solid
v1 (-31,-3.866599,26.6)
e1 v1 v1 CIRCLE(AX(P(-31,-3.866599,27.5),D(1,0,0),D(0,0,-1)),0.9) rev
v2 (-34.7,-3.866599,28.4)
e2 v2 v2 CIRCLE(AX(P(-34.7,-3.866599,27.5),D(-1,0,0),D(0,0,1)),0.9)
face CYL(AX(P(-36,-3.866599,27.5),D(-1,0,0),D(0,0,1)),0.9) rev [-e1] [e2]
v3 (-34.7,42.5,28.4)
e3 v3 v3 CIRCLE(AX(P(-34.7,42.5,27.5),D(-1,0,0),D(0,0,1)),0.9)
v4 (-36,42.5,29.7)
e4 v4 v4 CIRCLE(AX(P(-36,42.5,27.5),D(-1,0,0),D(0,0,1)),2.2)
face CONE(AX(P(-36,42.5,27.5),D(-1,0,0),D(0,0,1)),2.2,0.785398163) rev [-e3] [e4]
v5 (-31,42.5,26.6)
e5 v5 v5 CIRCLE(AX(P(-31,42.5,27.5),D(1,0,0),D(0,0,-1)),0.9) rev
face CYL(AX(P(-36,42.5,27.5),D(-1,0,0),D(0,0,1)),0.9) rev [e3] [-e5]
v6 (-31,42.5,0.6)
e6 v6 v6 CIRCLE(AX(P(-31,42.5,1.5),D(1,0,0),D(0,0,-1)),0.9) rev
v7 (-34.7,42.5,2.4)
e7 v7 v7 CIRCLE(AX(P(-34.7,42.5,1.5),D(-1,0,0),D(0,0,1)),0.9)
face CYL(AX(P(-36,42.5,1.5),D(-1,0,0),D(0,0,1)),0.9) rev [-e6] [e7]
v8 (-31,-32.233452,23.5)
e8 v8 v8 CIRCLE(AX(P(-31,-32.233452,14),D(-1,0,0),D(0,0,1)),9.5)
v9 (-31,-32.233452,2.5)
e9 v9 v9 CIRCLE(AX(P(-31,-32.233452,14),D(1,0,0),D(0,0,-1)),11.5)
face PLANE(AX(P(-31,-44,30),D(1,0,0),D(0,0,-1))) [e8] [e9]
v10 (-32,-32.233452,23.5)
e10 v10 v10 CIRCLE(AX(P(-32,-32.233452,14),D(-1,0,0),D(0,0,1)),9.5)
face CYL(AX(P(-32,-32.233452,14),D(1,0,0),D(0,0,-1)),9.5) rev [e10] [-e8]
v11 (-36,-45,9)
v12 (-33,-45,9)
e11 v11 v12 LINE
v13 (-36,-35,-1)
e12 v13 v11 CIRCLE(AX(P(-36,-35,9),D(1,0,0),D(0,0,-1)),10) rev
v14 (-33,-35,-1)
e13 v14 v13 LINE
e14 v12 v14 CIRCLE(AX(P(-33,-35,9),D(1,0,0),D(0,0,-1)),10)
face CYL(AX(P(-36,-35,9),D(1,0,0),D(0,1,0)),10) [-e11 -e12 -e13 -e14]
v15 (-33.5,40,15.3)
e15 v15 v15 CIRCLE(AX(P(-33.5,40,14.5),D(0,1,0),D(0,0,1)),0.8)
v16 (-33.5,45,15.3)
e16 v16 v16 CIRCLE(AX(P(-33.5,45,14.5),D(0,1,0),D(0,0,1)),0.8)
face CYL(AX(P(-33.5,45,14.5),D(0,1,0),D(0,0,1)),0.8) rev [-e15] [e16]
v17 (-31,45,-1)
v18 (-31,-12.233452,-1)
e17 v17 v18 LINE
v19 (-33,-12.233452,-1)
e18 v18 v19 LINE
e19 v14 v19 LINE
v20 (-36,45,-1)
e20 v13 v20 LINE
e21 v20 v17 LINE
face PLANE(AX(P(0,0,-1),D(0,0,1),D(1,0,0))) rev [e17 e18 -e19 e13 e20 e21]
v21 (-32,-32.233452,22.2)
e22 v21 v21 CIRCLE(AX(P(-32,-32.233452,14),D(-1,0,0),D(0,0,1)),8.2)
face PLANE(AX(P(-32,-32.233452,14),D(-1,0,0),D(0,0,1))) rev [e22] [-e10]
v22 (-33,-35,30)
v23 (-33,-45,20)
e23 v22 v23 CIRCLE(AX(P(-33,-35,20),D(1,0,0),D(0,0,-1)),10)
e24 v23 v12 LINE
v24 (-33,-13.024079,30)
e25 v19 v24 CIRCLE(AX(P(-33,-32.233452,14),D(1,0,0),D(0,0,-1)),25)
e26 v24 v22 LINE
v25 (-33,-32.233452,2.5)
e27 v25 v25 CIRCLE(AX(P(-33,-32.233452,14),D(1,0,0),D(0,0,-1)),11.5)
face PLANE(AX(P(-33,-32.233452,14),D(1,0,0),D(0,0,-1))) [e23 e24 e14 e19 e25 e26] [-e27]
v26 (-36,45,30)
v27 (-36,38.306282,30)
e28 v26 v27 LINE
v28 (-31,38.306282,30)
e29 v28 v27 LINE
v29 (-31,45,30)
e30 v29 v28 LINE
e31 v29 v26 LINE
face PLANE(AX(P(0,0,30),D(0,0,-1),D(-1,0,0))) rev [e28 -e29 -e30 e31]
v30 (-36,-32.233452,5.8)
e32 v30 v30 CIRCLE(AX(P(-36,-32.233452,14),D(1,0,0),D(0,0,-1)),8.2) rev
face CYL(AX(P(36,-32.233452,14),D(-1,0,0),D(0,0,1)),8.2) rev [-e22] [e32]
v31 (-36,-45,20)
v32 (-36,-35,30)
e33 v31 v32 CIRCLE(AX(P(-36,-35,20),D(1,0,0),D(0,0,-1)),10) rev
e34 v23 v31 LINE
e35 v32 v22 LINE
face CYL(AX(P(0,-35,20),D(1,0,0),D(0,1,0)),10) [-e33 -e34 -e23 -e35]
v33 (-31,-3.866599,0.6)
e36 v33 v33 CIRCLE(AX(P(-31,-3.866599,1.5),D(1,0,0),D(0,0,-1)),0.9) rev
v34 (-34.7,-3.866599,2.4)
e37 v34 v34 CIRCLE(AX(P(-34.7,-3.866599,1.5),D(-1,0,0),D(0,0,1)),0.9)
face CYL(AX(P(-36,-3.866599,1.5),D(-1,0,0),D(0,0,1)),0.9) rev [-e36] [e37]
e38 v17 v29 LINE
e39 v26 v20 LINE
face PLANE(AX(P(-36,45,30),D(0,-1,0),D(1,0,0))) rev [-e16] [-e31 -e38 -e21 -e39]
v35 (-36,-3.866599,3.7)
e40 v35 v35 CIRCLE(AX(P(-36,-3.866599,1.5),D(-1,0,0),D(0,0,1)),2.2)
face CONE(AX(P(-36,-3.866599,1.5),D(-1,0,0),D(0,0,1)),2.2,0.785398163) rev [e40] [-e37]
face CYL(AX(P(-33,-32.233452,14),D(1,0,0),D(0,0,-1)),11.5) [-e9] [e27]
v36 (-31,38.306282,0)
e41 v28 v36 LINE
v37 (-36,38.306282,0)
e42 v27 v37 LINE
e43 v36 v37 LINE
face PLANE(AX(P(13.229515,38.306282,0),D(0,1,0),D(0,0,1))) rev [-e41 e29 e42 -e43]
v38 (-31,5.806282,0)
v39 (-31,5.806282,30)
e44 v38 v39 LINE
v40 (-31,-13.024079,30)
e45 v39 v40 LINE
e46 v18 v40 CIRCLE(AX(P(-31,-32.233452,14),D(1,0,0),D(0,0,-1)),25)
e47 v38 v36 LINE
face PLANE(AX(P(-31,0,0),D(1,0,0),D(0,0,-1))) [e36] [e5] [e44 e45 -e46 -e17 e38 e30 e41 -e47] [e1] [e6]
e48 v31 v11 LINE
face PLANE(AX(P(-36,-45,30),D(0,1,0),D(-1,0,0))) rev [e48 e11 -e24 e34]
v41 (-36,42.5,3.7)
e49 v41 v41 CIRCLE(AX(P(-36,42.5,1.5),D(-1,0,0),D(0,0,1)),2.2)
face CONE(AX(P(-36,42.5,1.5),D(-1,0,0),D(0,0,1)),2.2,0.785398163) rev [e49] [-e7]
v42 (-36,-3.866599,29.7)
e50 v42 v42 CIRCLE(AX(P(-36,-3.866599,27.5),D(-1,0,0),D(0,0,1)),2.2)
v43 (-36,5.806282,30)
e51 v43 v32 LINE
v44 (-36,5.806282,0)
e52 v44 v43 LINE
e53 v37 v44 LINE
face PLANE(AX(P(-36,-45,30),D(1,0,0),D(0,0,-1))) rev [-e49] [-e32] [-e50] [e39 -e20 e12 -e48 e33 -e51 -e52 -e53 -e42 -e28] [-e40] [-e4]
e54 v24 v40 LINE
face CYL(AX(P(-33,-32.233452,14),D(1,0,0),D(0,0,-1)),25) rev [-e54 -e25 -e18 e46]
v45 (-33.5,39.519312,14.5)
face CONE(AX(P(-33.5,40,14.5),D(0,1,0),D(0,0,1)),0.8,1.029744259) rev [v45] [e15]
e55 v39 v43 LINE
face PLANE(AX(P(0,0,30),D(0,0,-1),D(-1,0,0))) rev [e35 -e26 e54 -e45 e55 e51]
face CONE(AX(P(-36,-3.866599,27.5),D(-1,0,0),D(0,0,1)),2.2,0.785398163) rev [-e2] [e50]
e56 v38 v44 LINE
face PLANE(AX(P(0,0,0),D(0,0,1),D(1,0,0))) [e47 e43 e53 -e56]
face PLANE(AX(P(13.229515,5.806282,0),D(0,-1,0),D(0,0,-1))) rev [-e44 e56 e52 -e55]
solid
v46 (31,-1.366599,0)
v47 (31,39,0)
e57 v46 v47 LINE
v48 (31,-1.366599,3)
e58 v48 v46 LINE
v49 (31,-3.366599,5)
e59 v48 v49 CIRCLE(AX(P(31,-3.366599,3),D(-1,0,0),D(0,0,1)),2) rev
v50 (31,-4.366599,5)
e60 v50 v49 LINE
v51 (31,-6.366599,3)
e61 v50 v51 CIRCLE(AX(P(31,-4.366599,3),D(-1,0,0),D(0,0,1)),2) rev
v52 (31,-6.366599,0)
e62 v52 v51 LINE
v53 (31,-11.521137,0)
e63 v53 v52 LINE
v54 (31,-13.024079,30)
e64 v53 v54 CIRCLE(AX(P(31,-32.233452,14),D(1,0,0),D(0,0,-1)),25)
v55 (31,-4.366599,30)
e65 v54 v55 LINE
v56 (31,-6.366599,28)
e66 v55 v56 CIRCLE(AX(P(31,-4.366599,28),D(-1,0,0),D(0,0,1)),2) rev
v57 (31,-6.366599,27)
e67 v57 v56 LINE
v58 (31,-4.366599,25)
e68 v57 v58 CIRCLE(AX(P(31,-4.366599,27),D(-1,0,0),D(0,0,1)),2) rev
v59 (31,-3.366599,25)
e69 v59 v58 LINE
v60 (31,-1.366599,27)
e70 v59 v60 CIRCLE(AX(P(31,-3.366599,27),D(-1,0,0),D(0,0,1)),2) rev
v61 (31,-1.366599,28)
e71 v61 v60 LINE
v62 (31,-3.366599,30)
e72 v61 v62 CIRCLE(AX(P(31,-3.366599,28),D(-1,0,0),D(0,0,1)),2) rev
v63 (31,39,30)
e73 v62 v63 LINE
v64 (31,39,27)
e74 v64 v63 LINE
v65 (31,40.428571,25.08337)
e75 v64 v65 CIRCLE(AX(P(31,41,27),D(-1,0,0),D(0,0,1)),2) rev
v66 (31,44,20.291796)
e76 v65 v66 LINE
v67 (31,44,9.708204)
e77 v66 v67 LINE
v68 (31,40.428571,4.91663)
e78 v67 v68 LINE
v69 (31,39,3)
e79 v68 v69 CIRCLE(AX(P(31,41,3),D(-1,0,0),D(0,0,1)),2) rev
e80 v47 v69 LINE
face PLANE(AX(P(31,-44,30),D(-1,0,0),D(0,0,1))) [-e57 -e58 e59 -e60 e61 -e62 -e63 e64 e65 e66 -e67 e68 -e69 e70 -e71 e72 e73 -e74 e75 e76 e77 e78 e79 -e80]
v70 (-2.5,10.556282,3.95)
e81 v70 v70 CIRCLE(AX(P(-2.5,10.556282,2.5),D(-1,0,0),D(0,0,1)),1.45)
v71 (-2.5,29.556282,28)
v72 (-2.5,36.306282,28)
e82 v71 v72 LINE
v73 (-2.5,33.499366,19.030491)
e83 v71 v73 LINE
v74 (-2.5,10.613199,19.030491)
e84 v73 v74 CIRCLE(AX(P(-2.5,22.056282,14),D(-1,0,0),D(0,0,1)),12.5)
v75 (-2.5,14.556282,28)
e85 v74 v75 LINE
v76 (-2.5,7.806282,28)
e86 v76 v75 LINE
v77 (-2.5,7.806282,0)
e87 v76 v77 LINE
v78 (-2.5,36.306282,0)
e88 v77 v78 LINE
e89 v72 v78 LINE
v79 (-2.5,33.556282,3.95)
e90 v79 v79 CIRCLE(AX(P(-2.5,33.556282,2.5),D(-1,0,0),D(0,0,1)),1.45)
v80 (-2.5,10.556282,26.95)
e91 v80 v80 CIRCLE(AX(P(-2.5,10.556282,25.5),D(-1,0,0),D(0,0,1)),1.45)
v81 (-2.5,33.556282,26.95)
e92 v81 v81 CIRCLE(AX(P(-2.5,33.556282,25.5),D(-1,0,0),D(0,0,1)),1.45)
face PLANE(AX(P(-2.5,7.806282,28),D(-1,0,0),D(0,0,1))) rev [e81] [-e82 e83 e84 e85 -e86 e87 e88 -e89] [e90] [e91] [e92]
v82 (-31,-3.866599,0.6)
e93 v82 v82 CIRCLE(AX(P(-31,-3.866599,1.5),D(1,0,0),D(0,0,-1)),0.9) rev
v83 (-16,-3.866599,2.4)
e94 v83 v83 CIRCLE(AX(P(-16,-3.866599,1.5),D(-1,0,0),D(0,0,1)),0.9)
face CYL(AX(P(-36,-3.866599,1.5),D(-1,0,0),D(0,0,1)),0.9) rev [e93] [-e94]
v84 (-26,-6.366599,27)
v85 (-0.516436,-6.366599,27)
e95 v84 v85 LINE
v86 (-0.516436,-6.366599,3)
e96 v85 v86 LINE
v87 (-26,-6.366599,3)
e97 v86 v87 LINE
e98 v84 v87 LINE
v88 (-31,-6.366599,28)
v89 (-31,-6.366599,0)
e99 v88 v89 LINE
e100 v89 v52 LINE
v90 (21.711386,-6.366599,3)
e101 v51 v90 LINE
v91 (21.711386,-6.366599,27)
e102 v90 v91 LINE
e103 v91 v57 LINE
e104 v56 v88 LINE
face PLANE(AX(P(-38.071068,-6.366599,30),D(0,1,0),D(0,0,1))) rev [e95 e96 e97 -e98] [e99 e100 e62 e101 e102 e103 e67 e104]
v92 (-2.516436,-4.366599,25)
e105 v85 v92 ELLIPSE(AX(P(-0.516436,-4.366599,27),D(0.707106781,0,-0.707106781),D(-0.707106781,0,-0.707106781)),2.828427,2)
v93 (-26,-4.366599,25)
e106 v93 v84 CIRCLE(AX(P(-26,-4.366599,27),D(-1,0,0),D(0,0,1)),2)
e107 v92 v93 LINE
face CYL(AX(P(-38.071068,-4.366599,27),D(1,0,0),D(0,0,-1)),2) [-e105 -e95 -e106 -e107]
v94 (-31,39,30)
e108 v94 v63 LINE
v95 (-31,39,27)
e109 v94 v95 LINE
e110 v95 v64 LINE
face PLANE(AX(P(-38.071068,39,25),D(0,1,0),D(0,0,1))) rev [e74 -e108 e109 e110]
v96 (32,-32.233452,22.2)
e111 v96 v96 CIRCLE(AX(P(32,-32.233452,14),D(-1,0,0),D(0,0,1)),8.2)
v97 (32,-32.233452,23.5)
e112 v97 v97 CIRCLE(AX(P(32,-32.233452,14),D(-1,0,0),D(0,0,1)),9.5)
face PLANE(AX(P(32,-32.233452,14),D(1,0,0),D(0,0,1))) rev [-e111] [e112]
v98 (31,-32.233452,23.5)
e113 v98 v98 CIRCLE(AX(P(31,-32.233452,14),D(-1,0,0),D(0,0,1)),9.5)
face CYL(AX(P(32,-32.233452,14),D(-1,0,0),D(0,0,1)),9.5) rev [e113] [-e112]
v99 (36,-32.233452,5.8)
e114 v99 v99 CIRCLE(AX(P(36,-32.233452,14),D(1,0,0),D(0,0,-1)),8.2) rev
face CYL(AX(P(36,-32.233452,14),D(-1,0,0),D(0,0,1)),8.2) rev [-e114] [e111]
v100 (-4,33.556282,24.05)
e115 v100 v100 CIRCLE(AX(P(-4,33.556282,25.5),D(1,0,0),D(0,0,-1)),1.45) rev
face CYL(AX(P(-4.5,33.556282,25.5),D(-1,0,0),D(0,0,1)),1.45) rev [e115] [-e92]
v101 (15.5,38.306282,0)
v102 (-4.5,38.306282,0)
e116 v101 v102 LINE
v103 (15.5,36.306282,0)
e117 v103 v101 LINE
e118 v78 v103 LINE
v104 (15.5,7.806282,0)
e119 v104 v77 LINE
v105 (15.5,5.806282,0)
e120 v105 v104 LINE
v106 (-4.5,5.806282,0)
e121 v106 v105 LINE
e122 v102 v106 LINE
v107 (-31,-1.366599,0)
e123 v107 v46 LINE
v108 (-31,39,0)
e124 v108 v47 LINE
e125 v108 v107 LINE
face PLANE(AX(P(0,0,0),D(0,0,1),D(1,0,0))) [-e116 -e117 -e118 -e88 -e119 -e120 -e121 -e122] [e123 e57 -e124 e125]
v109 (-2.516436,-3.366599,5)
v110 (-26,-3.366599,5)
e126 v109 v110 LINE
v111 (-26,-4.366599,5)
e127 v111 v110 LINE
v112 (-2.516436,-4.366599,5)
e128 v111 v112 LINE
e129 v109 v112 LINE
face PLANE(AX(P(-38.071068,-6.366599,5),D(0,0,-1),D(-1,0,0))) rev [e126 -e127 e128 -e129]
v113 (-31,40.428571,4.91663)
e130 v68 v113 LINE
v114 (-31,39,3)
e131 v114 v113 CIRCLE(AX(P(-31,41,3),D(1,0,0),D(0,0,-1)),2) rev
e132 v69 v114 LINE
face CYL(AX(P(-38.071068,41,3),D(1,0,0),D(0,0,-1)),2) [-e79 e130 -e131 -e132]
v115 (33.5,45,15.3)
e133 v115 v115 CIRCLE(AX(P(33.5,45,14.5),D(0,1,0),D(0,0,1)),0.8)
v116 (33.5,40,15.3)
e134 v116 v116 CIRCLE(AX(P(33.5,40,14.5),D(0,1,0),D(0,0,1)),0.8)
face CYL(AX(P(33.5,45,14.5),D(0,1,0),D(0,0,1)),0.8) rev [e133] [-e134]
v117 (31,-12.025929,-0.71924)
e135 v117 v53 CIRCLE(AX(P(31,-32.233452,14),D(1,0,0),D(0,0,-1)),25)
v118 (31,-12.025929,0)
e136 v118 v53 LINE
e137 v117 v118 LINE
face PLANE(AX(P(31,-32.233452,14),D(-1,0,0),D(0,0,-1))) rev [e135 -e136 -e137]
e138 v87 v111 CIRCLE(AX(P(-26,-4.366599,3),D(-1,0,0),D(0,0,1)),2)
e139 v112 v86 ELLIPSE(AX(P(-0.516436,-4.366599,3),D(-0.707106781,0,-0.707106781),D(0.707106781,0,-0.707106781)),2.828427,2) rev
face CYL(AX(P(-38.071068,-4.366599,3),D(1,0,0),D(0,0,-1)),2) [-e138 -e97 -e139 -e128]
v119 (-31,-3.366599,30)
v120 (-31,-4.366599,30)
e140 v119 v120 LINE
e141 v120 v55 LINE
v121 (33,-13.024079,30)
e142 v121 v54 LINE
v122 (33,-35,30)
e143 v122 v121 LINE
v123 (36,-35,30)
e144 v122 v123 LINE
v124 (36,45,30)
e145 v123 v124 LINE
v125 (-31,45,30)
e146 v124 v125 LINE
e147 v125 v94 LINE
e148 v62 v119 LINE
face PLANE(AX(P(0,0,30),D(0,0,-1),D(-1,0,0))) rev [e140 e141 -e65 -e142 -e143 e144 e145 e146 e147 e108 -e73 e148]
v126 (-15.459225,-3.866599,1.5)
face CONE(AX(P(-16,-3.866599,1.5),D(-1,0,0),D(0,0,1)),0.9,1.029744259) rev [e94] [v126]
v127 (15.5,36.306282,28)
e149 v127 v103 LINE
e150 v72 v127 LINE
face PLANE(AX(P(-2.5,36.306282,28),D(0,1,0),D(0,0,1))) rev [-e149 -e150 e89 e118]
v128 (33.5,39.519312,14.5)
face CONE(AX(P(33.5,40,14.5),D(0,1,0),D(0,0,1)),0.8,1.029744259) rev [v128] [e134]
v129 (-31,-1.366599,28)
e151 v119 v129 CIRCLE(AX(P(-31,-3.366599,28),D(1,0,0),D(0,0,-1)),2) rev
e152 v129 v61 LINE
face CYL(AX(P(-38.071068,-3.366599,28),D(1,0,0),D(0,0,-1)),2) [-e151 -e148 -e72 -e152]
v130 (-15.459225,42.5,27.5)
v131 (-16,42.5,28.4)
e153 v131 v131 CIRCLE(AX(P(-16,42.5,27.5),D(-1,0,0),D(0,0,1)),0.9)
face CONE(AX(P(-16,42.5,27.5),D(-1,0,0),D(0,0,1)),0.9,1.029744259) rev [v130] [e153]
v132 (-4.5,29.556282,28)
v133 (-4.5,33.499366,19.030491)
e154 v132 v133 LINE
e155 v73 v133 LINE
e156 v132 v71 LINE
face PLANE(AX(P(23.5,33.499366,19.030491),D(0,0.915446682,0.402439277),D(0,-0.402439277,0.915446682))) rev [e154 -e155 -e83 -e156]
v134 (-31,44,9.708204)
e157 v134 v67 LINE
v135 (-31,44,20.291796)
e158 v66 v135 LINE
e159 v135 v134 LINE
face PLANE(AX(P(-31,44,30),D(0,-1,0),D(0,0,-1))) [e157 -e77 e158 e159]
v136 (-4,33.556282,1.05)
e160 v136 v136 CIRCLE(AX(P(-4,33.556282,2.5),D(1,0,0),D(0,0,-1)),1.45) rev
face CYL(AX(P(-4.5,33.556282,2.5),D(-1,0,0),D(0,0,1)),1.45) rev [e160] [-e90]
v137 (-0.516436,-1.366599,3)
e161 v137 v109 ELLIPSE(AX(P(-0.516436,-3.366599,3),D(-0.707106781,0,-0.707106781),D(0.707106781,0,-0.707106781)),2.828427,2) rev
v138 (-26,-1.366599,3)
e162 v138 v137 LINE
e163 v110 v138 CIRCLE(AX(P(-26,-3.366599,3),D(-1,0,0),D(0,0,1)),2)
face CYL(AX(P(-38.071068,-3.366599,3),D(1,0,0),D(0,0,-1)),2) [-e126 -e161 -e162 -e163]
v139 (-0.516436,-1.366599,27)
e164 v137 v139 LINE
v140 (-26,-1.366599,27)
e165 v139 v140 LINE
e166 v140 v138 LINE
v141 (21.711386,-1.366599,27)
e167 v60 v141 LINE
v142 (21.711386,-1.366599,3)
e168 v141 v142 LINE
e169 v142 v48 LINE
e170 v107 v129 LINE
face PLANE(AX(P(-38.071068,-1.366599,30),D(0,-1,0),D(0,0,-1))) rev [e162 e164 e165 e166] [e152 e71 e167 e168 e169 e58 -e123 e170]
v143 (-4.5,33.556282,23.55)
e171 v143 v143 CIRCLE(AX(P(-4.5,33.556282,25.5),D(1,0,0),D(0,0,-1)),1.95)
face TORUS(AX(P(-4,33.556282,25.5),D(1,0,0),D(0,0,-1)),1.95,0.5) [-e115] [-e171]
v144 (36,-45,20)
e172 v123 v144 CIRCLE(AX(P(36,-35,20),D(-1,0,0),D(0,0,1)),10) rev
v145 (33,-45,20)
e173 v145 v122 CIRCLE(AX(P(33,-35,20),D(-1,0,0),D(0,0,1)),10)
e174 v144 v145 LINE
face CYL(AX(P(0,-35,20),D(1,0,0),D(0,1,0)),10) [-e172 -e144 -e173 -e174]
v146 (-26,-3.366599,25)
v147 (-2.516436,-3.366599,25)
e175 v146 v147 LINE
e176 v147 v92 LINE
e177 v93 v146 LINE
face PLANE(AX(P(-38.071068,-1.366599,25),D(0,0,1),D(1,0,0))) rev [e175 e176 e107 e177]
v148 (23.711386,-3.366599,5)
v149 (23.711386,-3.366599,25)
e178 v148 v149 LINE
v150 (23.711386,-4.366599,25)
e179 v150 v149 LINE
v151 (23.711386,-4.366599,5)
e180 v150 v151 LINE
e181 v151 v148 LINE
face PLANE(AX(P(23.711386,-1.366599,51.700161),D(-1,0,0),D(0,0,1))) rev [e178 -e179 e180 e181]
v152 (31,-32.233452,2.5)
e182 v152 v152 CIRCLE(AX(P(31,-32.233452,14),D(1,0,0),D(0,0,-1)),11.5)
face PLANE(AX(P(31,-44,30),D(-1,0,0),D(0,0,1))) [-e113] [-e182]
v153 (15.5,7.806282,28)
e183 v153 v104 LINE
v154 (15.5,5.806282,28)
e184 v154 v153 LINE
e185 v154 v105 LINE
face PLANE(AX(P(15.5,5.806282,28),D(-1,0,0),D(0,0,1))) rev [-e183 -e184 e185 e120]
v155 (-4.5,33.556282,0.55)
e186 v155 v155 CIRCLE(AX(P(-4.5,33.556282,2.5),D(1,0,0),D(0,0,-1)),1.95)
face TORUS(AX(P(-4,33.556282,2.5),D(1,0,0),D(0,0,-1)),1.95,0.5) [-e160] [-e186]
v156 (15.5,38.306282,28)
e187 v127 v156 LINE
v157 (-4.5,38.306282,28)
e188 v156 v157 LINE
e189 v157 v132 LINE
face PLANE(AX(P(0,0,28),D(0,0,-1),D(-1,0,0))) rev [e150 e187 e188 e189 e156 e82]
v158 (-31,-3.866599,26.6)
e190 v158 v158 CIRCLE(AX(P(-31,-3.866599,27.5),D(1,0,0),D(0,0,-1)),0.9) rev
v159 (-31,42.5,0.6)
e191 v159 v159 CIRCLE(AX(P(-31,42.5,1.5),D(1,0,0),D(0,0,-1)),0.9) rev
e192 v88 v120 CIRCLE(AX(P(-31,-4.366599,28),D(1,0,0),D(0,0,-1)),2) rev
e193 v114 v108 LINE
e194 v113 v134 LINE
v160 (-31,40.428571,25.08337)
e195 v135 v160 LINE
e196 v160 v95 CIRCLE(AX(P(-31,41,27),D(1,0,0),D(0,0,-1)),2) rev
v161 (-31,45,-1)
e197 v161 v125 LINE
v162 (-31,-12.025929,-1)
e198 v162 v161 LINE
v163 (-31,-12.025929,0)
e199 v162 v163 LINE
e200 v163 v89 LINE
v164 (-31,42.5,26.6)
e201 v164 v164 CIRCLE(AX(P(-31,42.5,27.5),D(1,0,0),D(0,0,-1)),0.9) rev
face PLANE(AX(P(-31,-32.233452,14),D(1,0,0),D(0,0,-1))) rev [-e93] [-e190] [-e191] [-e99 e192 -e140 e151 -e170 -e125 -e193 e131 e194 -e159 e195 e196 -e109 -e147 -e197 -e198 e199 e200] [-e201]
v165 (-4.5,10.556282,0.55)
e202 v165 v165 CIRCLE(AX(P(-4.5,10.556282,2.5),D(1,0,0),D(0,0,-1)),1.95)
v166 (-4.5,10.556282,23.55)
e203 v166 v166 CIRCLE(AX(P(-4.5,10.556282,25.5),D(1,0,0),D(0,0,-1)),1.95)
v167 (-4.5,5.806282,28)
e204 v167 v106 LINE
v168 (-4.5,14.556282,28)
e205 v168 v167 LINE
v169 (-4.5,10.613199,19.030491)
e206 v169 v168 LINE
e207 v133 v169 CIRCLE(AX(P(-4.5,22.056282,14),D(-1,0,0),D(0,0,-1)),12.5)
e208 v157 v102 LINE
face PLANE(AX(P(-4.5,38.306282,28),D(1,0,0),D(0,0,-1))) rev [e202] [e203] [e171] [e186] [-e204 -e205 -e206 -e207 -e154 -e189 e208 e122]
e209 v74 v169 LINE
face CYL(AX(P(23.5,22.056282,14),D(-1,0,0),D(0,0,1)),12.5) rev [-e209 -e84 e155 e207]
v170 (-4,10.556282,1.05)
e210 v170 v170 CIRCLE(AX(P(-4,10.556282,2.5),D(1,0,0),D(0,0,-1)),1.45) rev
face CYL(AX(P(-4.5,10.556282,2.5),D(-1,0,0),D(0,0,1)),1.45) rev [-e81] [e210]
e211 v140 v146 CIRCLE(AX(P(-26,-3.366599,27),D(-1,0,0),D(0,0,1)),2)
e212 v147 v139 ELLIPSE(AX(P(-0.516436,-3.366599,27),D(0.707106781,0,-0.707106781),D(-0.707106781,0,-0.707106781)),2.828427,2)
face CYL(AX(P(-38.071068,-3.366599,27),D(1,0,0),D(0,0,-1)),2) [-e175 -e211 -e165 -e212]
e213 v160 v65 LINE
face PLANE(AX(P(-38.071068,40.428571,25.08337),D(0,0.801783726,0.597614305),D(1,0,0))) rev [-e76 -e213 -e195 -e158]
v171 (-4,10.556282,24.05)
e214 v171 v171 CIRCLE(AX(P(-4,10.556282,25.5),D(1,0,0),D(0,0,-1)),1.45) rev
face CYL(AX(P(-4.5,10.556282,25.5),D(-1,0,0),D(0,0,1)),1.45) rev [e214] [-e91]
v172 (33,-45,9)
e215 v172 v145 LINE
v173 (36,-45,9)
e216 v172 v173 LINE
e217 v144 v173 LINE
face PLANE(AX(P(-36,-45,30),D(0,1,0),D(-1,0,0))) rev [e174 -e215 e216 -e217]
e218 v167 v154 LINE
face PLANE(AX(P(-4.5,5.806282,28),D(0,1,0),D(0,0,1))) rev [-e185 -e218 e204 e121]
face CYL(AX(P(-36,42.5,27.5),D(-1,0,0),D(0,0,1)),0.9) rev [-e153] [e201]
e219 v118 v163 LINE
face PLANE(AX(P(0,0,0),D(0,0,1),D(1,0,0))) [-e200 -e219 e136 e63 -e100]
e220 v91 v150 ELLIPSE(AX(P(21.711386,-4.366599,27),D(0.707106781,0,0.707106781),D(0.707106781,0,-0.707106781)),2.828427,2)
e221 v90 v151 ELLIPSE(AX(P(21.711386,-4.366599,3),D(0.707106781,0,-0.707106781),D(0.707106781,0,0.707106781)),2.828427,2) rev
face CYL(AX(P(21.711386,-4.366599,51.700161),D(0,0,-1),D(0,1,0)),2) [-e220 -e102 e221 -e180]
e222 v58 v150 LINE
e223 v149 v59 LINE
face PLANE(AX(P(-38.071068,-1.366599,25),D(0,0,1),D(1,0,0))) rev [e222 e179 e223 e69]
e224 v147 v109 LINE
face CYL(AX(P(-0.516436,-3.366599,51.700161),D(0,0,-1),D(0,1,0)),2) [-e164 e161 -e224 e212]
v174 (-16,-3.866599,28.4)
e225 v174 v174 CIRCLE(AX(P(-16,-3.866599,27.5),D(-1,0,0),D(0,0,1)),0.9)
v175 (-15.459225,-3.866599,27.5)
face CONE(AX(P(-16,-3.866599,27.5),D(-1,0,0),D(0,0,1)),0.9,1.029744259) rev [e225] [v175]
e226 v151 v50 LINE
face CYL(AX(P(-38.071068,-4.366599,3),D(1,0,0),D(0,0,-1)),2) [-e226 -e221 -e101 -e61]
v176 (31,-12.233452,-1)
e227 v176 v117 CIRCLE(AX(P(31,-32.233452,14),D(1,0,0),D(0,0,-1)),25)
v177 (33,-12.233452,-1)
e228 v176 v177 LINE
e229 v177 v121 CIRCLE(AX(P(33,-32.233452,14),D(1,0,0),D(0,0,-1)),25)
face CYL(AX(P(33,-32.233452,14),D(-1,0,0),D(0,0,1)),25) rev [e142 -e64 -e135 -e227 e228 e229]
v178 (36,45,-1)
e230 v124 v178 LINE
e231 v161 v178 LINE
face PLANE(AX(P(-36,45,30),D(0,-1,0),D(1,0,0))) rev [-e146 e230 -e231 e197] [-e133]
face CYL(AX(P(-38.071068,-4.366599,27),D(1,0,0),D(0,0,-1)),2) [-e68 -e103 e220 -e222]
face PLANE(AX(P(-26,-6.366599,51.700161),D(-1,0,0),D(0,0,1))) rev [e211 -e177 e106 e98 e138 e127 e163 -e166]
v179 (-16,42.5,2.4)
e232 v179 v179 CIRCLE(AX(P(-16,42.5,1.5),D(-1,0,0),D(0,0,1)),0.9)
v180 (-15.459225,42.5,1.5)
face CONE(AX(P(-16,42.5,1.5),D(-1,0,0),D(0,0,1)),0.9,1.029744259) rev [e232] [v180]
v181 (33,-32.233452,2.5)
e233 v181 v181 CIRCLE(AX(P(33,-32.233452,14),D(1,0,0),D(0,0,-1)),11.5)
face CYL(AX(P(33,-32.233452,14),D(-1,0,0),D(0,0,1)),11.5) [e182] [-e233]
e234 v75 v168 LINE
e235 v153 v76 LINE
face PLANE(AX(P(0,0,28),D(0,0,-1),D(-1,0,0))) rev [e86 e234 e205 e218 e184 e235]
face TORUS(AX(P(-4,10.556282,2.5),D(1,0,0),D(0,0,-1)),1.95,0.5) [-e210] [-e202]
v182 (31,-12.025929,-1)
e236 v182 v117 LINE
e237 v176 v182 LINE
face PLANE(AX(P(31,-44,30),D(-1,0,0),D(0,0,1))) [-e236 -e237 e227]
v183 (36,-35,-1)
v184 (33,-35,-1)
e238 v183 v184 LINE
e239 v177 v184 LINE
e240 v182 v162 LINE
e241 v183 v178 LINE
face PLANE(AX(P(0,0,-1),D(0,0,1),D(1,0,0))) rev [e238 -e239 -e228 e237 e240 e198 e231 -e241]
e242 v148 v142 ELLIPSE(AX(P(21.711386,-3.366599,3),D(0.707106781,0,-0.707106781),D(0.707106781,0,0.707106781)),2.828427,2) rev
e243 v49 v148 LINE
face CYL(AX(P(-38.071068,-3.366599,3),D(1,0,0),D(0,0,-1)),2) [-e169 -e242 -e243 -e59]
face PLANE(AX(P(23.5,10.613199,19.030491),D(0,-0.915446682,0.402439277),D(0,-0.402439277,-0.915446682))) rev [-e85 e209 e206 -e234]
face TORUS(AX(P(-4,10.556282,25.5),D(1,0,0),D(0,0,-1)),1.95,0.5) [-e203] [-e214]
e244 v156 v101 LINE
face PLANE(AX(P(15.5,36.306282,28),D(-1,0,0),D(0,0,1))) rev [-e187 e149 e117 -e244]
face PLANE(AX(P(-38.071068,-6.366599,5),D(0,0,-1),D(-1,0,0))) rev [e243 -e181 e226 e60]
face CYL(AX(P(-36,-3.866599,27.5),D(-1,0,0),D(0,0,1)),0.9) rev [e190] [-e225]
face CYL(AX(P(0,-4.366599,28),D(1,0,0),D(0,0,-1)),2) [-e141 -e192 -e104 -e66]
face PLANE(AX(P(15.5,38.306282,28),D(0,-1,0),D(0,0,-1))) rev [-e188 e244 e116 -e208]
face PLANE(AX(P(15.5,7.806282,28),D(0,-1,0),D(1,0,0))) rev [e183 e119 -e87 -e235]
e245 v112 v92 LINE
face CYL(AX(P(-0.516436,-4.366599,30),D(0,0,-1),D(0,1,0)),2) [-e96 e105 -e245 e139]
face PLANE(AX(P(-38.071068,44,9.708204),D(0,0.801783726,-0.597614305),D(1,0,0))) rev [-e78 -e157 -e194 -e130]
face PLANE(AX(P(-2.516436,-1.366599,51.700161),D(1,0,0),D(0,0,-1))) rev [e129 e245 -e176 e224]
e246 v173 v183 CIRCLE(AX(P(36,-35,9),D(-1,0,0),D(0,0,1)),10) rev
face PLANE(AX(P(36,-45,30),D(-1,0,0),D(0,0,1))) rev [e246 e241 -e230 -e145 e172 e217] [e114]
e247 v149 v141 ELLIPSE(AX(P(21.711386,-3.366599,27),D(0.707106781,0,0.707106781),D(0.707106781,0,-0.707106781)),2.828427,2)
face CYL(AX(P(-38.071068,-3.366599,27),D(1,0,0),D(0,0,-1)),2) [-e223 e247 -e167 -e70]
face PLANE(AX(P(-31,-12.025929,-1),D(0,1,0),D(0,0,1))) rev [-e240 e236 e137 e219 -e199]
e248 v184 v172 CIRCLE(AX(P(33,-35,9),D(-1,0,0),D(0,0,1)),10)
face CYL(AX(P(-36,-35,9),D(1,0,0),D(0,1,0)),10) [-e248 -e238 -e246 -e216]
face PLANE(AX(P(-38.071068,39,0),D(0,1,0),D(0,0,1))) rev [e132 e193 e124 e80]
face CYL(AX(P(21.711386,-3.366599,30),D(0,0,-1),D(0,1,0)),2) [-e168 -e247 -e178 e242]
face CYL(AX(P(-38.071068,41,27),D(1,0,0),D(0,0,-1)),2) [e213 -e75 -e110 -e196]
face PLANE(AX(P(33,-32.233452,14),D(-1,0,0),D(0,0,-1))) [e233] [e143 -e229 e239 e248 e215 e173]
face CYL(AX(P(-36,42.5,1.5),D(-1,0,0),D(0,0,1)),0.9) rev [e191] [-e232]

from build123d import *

# Parameters (mm, degrees)
SKETCH1_W                                       = 72
SKETCH1_H                                       = 90
SKETCH1_W_2                                     = 62
SKETCH1_H_2                                     = 88
BOSS_EXTRUDE1_DEPTH                             = 30
SKETCH1_2_W                                     = 72
SKETCH1_2_H                                     = 90
SKETCH1_2_W_2                                   = 62
SKETCH1_2_H_2                                   = 88
BOSS_EXTRUDE2_DEPTH                             = 1
BOSS_EXTRUDE3_DEPTH                             = 28
CUT_EXTRUDE1_DEPTH                              = 28
SKETCH13_W                                      = 30
SKETCH13_H                                      = 32.5
CUT_EXTRUDE6_DEPTH                              = 5
M2_5_CLEARANCE_HOLE1_D                          = 2.9
M2_5_CLEARANCE_HOLE1_DEPTH                      = 2
M2_5_CLEARANCE_HOLE1_TIP                        = 0.871247898
FILLET2_R                                       = 0.5
CUT_EXTRUDE2_DEPTH                              = 87.104587567
CUT_EXTRUDE2_DEPTH_BACK                         = 87.104587567
SKETCH5_R                                       = 8.2
SKETCH5_3_R                                     = 9.5
SKETCH5_3_R_2                                   = 8.2
CUT_EXTRUDE3_DEPTH                              = 1
CUT_EXTRUDE5_DEPTH                              = 65.969223483
CUT_EXTRUDE5_DEPTH_BACK                         = 65.969223483
SKETCH11_W                                      = 62
SKETCH11_H                                      = 42.378459444
SKETCH10_R                                      = 25
SKETCH10_R_2                                    = 11.5
CUT_EXTRUDE4_DEPTH                              = 2
SKETCH12_W                                      = 5
SKETCH12_H                                      = 5
BOSS_EXTRUDE4_DEPTH                             = 62
SKETCH14_W                                      = 26.227821151
SKETCH14_H                                      = 5
SKETCH14_W_2                                    = 5
BOSS_EXTRUDE5_DEPTH                             = 20
FILLET1_R                                       = 2
CHAMFER1_START                                  = -32
CHAMFER1_DEPTH                                  = 64
TAP_DRILL_FOR_M2X0_4_TAP1_D                     = 1.6
TAP_DRILL_FOR_M2X0_4_TAP1_DEPTH                 = 5
TAP_DRILL_FOR_M2X0_4_TAP1_TIP                   = 0.480688495
CSK_FOR_M2_FLAT_HEAD_MACHINE_SCREW1_D           = 1.8
CSK_FOR_M2_FLAT_HEAD_MACHINE_SCREW1_DEPTH       = 20
CSK_FOR_M2_FLAT_HEAD_MACHINE_SCREW1_CSINK_D     = 4.4
CSK_FOR_M2_FLAT_HEAD_MACHINE_SCREW1_CSINK_ANGLE = 90
CSK_FOR_M2_FLAT_HEAD_MACHINE_SCREW1_TIP         = 0.540774557
FILLET3_R                                       = 10


with BuildPart() as part:
    # Sketch1 → Boss-Extrude1 (new body)
    with BuildSketch(Plane.XY):
        Rectangle(SKETCH1_W, SKETCH1_H)
        Rectangle(SKETCH1_W_2, SKETCH1_H_2, mode=Mode.SUBTRACT)
    extrude(amount=BOSS_EXTRUDE1_DEPTH)

    # Sketch1<2> → Boss-Extrude2 (add)
    # profile 1 of 2: a face of its own
    with BuildSketch(Plane.XY):
        Rectangle(SKETCH1_2_W, SKETCH1_2_H)
        Rectangle(SKETCH1_2_W_2, SKETCH1_2_H_2, mode=Mode.SUBTRACT)
    # profile 2 of 2: a face of its own
    with BuildSketch(Plane.XY):
        Rectangle(SKETCH1_2_W_2, SKETCH1_2_H_2)
    extrude(amount=-BOSS_EXTRUDE2_DEPTH)

    # Sketch2 → Boss-Extrude3 (add)
    with BuildSketch(Plane.XY):
        Polygon((15.5, 36.306282193), (15.5, 38.306282193), (-4.5, 38.306282193), (-4.5, 5.806282193), (15.5, 5.806282193), (15.5, 7.806282193), (-2.5, 7.806282193), (-2.5, 36.306282193), align=None)
    extrude(amount=BOSS_EXTRUDE3_DEPTH)

    # Sketch3 → Cut-Extrude1 (cut)
    with BuildSketch(Plane.ZY.offset(4.5)):
        with BuildLine():
            Line((19.030490967, 33.499365721), (28, 29.556282193))
            Line((28, 29.556282193), (28, 14.556282193))
            Line((28, 14.556282193), (19.030490967, 10.613198665))
            ThreePointArc((19.030490967, 10.613198665), (1.5, 22.056282193), (19.030490967, 33.499365721))
        make_face()
    extrude(amount=-CUT_EXTRUDE1_DEPTH, mode=Mode.SUBTRACT)

    # Sketch13 → Cut-Extrude6 (cut)
    with BuildSketch(Plane.ZY.offset(36)):
        with Locations((15, 22.056282193)):
            Rectangle(SKETCH13_W, SKETCH13_H)
    extrude(amount=-CUT_EXTRUDE6_DEPTH, mode=Mode.SUBTRACT)

    # M2.5 Clearance Hole1
    with Locations(Plane.ZY.offset(4.5)):
        with Locations((14, 22.056282193), (2.5, 33.556282193), (25.5, 33.556282193), (25.5, 10.556282193), (2.5, 10.556282193)):
            Hole(M2_5_CLEARANCE_HOLE1_D / 2, depth=M2_5_CLEARANCE_HOLE1_DEPTH)
            with Locations((0, 0, -(M2_5_CLEARANCE_HOLE1_DEPTH + M2_5_CLEARANCE_HOLE1_TIP / 2))):  # 118° drill point
                Cone(0, M2_5_CLEARANCE_HOLE1_D / 2, M2_5_CLEARANCE_HOLE1_TIP, mode=Mode.SUBTRACT)

    # Fillet2
    fillet2_edges = [part.edges().sort_by_distance(p)[0] for p in [
        (-4.5, 10.556282193, 3.95),
        (-4.5, 10.556282193, 26.95),
        (-4.5, 33.556282193, 26.95),
        (-4.5, 33.556282193, 3.95),
    ]]
    fillet(fillet2_edges, radius=FILLET2_R)

    # Sketch5 → Cut-Extrude2 (cut, two sides: drawn at the far end of the back side and taken through both)
    with BuildSketch(Plane.ZY.offset(31).offset(-CUT_EXTRUDE2_DEPTH_BACK)):
        with Locations((14, -32.233452062)):
            Circle(SKETCH5_R)
    extrude(amount=CUT_EXTRUDE2_DEPTH + CUT_EXTRUDE2_DEPTH_BACK, mode=Mode.SUBTRACT)

    # Sketch5<3> → Cut-Extrude3 (cut)
    with BuildSketch(Plane.ZY.offset(31)):
        with Locations((14, -32.233452062)):
            Circle(SKETCH5_3_R)
        with Locations((14, -32.233452062)):
            Circle(SKETCH5_3_R_2, mode=Mode.SUBTRACT)
    cut_extrude3 = extrude(amount=CUT_EXTRUDE3_DEPTH, mode=Mode.SUBTRACT)

    # Sketch11 → Cut-Extrude5 (cut, two sides: drawn at the far end of the back side and taken through both)
    with BuildSketch(Plane.XY.offset(-CUT_EXTRUDE5_DEPTH_BACK)):
        with Locations((0, -33.215158936)):
            Rectangle(SKETCH11_W, SKETCH11_H)
    extrude(amount=CUT_EXTRUDE5_DEPTH + CUT_EXTRUDE5_DEPTH_BACK, mode=Mode.SUBTRACT)

    # Sketch10 → Cut-Extrude4 (cut)
    with BuildSketch(Plane(origin=(-31, 0, 0), x_dir=(0, 0, -1), z_dir=(1, 0, 0))):
        with Locations((-14, -32.233452062)):
            Circle(SKETCH10_R)
        with Locations((-14, -32.233452062)):
            Circle(SKETCH10_R_2, mode=Mode.SUBTRACT)
    cut_extrude4 = extrude(amount=-CUT_EXTRUDE4_DEPTH, mode=Mode.SUBTRACT)

    # Mirror1: Cut-Extrude3, Cut-Extrude4 across plane
    add(cut_extrude3.mirror(Plane.ZY), mode=Mode.SUBTRACT)
    add(cut_extrude4.mirror(Plane.ZY), mode=Mode.SUBTRACT)

    # Sketch12 → Boss-Extrude4 (add)
    with BuildSketch(Plane.ZY.offset(-31)):
        with Locations((2.5, 41.5)):
            Rectangle(SKETCH12_W, SKETCH12_H)
        with Locations((27.5, 41.5)):
            Rectangle(SKETCH12_W, SKETCH12_H)
        with Locations((27.5, -3.866599123)):
            Rectangle(SKETCH12_W, SKETCH12_H)
        with Locations((2.5, -3.866599123)):
            Rectangle(SKETCH12_W, SKETCH12_H)
    extrude(amount=BOSS_EXTRUDE4_DEPTH)

    # Sketch14 → Boss-Extrude5 (add)
    with BuildSketch(Plane.XY.offset(5)):
        with Locations((10.597474937, -3.866599123)):
            Rectangle(SKETCH14_W, SKETCH14_H)
        with Locations((-28.5, -3.866599123)):
            Rectangle(SKETCH14_W_2, SKETCH14_H)
    extrude(amount=BOSS_EXTRUDE5_DEPTH)

    # Fillet1
    fillet1_edges = [part.edges().sort_by_distance(p)[0] for p in [
        (0, 39, 5),
        (0, 39, 25),
        (0, -1.366599123, 30),
        (0, -6.366599123, 30),
        (27.355692757, -1.366599123, 5),
        (27.355692757, -6.366599123, 5),
        (27.355692757, -1.366599123, 25),
        (27.355692757, -6.366599123, 25),
        (-2.516435638, -1.366599123, 15),
        (-2.516435638, -6.366599123, 15),
        (23.711385513, -6.366599123, 15),
        (23.711385513, -1.366599123, 15),
        (-14.258217819, -1.366599123, 25),
        (-14.258217819, -1.366599123, 5),
        (-14.258217819, -6.366599123, 25),
        (-14.258217819, -6.366599123, 5),
    ]]
    fillet(fillet1_edges, radius=FILLET1_R)

    # Chamfer1: read off the stored shape, not the designer's step
    # Chamfer1 outline → Chamfer1 (add)
    with BuildSketch(Plane.YZ.offset(CHAMFER1_START)):
        with BuildLine():
            Line((40.428571429, 25.083370305), (44, 20.291796068))
            Line((44, 20.291796068), (44, 25))
            Line((44, 25), (41, 25))
            ThreePointArc((41, 25), (40.711260836, 25.020952326), (40.428571429, 25.083370305))
        make_face()
        with BuildLine():
            Line((44, 9.708203932), (40.428571429, 4.916629695))
            ThreePointArc((40.428571429, 4.916629695), (40.711260836, 4.979047674), (41, 5))
            Line((41, 5), (44, 5))
            Line((44, 5), (44, 9.708203932))
        make_face()
    extrude(amount=CHAMFER1_DEPTH)

    # Tap Drill for M2x0.4 Tap1
    with Locations(Plane(origin=(0, 45, 0), x_dir=(1, 0, 0), z_dir=(0, 1, 0))):
        with Locations((-33.5, -14.5), (33.5, -14.5)):
            Hole(TAP_DRILL_FOR_M2X0_4_TAP1_D / 2, depth=TAP_DRILL_FOR_M2X0_4_TAP1_DEPTH)
            with Locations((0, 0, -(TAP_DRILL_FOR_M2X0_4_TAP1_DEPTH + TAP_DRILL_FOR_M2X0_4_TAP1_TIP / 2))):  # 118° drill point
                Cone(0, TAP_DRILL_FOR_M2X0_4_TAP1_D / 2, TAP_DRILL_FOR_M2X0_4_TAP1_TIP, mode=Mode.SUBTRACT)

    # CSK for M2 Flat Head Machine Screw1
    with Locations(Plane.ZY.offset(36)):
        with Locations((1.5, 42.5), (27.5, -3.866599123), (1.5, -3.866599123), (27.5, 42.5)):
            CounterSinkHole(CSK_FOR_M2_FLAT_HEAD_MACHINE_SCREW1_D / 2, CSK_FOR_M2_FLAT_HEAD_MACHINE_SCREW1_CSINK_D / 2, depth=CSK_FOR_M2_FLAT_HEAD_MACHINE_SCREW1_DEPTH, counter_sink_angle=CSK_FOR_M2_FLAT_HEAD_MACHINE_SCREW1_CSINK_ANGLE)
            with Locations((0, 0, -(CSK_FOR_M2_FLAT_HEAD_MACHINE_SCREW1_DEPTH + CSK_FOR_M2_FLAT_HEAD_MACHINE_SCREW1_TIP / 2))):  # 118° drill point
                Cone(0, CSK_FOR_M2_FLAT_HEAD_MACHINE_SCREW1_D / 2, CSK_FOR_M2_FLAT_HEAD_MACHINE_SCREW1_TIP, mode=Mode.SUBTRACT)

    # Fillet3
    fillet3_edges = [part.edges().sort_by_distance(p)[0] for p in [
        (-34.5, -45, 30),
        (34.5, -45, -1),
        (34.5, -45, 30),
        (-34.5, -45, -1),
    ]]
    fillet(fillet3_edges, radius=FILLET3_R)


with BuildPart() as body_2:
    # Split1: the piece on the far side of the plane
    add(part.part)
    split(bisect_by=Plane(origin=(-31, 0, 0), x_dir=(0, 0, 1), z_dir=(1, 0, 0)), keep=Keep.BOTTOM)


with BuildPart() as part_1:
    add(part.part)

    # Split1
    split(bisect_by=Plane(origin=(-31, 0, 0), x_dir=(0, 0, 1), z_dir=(1, 0, 0)), keep=Keep.TOP)


solid = Compound([body_2.part, part_1.part])
